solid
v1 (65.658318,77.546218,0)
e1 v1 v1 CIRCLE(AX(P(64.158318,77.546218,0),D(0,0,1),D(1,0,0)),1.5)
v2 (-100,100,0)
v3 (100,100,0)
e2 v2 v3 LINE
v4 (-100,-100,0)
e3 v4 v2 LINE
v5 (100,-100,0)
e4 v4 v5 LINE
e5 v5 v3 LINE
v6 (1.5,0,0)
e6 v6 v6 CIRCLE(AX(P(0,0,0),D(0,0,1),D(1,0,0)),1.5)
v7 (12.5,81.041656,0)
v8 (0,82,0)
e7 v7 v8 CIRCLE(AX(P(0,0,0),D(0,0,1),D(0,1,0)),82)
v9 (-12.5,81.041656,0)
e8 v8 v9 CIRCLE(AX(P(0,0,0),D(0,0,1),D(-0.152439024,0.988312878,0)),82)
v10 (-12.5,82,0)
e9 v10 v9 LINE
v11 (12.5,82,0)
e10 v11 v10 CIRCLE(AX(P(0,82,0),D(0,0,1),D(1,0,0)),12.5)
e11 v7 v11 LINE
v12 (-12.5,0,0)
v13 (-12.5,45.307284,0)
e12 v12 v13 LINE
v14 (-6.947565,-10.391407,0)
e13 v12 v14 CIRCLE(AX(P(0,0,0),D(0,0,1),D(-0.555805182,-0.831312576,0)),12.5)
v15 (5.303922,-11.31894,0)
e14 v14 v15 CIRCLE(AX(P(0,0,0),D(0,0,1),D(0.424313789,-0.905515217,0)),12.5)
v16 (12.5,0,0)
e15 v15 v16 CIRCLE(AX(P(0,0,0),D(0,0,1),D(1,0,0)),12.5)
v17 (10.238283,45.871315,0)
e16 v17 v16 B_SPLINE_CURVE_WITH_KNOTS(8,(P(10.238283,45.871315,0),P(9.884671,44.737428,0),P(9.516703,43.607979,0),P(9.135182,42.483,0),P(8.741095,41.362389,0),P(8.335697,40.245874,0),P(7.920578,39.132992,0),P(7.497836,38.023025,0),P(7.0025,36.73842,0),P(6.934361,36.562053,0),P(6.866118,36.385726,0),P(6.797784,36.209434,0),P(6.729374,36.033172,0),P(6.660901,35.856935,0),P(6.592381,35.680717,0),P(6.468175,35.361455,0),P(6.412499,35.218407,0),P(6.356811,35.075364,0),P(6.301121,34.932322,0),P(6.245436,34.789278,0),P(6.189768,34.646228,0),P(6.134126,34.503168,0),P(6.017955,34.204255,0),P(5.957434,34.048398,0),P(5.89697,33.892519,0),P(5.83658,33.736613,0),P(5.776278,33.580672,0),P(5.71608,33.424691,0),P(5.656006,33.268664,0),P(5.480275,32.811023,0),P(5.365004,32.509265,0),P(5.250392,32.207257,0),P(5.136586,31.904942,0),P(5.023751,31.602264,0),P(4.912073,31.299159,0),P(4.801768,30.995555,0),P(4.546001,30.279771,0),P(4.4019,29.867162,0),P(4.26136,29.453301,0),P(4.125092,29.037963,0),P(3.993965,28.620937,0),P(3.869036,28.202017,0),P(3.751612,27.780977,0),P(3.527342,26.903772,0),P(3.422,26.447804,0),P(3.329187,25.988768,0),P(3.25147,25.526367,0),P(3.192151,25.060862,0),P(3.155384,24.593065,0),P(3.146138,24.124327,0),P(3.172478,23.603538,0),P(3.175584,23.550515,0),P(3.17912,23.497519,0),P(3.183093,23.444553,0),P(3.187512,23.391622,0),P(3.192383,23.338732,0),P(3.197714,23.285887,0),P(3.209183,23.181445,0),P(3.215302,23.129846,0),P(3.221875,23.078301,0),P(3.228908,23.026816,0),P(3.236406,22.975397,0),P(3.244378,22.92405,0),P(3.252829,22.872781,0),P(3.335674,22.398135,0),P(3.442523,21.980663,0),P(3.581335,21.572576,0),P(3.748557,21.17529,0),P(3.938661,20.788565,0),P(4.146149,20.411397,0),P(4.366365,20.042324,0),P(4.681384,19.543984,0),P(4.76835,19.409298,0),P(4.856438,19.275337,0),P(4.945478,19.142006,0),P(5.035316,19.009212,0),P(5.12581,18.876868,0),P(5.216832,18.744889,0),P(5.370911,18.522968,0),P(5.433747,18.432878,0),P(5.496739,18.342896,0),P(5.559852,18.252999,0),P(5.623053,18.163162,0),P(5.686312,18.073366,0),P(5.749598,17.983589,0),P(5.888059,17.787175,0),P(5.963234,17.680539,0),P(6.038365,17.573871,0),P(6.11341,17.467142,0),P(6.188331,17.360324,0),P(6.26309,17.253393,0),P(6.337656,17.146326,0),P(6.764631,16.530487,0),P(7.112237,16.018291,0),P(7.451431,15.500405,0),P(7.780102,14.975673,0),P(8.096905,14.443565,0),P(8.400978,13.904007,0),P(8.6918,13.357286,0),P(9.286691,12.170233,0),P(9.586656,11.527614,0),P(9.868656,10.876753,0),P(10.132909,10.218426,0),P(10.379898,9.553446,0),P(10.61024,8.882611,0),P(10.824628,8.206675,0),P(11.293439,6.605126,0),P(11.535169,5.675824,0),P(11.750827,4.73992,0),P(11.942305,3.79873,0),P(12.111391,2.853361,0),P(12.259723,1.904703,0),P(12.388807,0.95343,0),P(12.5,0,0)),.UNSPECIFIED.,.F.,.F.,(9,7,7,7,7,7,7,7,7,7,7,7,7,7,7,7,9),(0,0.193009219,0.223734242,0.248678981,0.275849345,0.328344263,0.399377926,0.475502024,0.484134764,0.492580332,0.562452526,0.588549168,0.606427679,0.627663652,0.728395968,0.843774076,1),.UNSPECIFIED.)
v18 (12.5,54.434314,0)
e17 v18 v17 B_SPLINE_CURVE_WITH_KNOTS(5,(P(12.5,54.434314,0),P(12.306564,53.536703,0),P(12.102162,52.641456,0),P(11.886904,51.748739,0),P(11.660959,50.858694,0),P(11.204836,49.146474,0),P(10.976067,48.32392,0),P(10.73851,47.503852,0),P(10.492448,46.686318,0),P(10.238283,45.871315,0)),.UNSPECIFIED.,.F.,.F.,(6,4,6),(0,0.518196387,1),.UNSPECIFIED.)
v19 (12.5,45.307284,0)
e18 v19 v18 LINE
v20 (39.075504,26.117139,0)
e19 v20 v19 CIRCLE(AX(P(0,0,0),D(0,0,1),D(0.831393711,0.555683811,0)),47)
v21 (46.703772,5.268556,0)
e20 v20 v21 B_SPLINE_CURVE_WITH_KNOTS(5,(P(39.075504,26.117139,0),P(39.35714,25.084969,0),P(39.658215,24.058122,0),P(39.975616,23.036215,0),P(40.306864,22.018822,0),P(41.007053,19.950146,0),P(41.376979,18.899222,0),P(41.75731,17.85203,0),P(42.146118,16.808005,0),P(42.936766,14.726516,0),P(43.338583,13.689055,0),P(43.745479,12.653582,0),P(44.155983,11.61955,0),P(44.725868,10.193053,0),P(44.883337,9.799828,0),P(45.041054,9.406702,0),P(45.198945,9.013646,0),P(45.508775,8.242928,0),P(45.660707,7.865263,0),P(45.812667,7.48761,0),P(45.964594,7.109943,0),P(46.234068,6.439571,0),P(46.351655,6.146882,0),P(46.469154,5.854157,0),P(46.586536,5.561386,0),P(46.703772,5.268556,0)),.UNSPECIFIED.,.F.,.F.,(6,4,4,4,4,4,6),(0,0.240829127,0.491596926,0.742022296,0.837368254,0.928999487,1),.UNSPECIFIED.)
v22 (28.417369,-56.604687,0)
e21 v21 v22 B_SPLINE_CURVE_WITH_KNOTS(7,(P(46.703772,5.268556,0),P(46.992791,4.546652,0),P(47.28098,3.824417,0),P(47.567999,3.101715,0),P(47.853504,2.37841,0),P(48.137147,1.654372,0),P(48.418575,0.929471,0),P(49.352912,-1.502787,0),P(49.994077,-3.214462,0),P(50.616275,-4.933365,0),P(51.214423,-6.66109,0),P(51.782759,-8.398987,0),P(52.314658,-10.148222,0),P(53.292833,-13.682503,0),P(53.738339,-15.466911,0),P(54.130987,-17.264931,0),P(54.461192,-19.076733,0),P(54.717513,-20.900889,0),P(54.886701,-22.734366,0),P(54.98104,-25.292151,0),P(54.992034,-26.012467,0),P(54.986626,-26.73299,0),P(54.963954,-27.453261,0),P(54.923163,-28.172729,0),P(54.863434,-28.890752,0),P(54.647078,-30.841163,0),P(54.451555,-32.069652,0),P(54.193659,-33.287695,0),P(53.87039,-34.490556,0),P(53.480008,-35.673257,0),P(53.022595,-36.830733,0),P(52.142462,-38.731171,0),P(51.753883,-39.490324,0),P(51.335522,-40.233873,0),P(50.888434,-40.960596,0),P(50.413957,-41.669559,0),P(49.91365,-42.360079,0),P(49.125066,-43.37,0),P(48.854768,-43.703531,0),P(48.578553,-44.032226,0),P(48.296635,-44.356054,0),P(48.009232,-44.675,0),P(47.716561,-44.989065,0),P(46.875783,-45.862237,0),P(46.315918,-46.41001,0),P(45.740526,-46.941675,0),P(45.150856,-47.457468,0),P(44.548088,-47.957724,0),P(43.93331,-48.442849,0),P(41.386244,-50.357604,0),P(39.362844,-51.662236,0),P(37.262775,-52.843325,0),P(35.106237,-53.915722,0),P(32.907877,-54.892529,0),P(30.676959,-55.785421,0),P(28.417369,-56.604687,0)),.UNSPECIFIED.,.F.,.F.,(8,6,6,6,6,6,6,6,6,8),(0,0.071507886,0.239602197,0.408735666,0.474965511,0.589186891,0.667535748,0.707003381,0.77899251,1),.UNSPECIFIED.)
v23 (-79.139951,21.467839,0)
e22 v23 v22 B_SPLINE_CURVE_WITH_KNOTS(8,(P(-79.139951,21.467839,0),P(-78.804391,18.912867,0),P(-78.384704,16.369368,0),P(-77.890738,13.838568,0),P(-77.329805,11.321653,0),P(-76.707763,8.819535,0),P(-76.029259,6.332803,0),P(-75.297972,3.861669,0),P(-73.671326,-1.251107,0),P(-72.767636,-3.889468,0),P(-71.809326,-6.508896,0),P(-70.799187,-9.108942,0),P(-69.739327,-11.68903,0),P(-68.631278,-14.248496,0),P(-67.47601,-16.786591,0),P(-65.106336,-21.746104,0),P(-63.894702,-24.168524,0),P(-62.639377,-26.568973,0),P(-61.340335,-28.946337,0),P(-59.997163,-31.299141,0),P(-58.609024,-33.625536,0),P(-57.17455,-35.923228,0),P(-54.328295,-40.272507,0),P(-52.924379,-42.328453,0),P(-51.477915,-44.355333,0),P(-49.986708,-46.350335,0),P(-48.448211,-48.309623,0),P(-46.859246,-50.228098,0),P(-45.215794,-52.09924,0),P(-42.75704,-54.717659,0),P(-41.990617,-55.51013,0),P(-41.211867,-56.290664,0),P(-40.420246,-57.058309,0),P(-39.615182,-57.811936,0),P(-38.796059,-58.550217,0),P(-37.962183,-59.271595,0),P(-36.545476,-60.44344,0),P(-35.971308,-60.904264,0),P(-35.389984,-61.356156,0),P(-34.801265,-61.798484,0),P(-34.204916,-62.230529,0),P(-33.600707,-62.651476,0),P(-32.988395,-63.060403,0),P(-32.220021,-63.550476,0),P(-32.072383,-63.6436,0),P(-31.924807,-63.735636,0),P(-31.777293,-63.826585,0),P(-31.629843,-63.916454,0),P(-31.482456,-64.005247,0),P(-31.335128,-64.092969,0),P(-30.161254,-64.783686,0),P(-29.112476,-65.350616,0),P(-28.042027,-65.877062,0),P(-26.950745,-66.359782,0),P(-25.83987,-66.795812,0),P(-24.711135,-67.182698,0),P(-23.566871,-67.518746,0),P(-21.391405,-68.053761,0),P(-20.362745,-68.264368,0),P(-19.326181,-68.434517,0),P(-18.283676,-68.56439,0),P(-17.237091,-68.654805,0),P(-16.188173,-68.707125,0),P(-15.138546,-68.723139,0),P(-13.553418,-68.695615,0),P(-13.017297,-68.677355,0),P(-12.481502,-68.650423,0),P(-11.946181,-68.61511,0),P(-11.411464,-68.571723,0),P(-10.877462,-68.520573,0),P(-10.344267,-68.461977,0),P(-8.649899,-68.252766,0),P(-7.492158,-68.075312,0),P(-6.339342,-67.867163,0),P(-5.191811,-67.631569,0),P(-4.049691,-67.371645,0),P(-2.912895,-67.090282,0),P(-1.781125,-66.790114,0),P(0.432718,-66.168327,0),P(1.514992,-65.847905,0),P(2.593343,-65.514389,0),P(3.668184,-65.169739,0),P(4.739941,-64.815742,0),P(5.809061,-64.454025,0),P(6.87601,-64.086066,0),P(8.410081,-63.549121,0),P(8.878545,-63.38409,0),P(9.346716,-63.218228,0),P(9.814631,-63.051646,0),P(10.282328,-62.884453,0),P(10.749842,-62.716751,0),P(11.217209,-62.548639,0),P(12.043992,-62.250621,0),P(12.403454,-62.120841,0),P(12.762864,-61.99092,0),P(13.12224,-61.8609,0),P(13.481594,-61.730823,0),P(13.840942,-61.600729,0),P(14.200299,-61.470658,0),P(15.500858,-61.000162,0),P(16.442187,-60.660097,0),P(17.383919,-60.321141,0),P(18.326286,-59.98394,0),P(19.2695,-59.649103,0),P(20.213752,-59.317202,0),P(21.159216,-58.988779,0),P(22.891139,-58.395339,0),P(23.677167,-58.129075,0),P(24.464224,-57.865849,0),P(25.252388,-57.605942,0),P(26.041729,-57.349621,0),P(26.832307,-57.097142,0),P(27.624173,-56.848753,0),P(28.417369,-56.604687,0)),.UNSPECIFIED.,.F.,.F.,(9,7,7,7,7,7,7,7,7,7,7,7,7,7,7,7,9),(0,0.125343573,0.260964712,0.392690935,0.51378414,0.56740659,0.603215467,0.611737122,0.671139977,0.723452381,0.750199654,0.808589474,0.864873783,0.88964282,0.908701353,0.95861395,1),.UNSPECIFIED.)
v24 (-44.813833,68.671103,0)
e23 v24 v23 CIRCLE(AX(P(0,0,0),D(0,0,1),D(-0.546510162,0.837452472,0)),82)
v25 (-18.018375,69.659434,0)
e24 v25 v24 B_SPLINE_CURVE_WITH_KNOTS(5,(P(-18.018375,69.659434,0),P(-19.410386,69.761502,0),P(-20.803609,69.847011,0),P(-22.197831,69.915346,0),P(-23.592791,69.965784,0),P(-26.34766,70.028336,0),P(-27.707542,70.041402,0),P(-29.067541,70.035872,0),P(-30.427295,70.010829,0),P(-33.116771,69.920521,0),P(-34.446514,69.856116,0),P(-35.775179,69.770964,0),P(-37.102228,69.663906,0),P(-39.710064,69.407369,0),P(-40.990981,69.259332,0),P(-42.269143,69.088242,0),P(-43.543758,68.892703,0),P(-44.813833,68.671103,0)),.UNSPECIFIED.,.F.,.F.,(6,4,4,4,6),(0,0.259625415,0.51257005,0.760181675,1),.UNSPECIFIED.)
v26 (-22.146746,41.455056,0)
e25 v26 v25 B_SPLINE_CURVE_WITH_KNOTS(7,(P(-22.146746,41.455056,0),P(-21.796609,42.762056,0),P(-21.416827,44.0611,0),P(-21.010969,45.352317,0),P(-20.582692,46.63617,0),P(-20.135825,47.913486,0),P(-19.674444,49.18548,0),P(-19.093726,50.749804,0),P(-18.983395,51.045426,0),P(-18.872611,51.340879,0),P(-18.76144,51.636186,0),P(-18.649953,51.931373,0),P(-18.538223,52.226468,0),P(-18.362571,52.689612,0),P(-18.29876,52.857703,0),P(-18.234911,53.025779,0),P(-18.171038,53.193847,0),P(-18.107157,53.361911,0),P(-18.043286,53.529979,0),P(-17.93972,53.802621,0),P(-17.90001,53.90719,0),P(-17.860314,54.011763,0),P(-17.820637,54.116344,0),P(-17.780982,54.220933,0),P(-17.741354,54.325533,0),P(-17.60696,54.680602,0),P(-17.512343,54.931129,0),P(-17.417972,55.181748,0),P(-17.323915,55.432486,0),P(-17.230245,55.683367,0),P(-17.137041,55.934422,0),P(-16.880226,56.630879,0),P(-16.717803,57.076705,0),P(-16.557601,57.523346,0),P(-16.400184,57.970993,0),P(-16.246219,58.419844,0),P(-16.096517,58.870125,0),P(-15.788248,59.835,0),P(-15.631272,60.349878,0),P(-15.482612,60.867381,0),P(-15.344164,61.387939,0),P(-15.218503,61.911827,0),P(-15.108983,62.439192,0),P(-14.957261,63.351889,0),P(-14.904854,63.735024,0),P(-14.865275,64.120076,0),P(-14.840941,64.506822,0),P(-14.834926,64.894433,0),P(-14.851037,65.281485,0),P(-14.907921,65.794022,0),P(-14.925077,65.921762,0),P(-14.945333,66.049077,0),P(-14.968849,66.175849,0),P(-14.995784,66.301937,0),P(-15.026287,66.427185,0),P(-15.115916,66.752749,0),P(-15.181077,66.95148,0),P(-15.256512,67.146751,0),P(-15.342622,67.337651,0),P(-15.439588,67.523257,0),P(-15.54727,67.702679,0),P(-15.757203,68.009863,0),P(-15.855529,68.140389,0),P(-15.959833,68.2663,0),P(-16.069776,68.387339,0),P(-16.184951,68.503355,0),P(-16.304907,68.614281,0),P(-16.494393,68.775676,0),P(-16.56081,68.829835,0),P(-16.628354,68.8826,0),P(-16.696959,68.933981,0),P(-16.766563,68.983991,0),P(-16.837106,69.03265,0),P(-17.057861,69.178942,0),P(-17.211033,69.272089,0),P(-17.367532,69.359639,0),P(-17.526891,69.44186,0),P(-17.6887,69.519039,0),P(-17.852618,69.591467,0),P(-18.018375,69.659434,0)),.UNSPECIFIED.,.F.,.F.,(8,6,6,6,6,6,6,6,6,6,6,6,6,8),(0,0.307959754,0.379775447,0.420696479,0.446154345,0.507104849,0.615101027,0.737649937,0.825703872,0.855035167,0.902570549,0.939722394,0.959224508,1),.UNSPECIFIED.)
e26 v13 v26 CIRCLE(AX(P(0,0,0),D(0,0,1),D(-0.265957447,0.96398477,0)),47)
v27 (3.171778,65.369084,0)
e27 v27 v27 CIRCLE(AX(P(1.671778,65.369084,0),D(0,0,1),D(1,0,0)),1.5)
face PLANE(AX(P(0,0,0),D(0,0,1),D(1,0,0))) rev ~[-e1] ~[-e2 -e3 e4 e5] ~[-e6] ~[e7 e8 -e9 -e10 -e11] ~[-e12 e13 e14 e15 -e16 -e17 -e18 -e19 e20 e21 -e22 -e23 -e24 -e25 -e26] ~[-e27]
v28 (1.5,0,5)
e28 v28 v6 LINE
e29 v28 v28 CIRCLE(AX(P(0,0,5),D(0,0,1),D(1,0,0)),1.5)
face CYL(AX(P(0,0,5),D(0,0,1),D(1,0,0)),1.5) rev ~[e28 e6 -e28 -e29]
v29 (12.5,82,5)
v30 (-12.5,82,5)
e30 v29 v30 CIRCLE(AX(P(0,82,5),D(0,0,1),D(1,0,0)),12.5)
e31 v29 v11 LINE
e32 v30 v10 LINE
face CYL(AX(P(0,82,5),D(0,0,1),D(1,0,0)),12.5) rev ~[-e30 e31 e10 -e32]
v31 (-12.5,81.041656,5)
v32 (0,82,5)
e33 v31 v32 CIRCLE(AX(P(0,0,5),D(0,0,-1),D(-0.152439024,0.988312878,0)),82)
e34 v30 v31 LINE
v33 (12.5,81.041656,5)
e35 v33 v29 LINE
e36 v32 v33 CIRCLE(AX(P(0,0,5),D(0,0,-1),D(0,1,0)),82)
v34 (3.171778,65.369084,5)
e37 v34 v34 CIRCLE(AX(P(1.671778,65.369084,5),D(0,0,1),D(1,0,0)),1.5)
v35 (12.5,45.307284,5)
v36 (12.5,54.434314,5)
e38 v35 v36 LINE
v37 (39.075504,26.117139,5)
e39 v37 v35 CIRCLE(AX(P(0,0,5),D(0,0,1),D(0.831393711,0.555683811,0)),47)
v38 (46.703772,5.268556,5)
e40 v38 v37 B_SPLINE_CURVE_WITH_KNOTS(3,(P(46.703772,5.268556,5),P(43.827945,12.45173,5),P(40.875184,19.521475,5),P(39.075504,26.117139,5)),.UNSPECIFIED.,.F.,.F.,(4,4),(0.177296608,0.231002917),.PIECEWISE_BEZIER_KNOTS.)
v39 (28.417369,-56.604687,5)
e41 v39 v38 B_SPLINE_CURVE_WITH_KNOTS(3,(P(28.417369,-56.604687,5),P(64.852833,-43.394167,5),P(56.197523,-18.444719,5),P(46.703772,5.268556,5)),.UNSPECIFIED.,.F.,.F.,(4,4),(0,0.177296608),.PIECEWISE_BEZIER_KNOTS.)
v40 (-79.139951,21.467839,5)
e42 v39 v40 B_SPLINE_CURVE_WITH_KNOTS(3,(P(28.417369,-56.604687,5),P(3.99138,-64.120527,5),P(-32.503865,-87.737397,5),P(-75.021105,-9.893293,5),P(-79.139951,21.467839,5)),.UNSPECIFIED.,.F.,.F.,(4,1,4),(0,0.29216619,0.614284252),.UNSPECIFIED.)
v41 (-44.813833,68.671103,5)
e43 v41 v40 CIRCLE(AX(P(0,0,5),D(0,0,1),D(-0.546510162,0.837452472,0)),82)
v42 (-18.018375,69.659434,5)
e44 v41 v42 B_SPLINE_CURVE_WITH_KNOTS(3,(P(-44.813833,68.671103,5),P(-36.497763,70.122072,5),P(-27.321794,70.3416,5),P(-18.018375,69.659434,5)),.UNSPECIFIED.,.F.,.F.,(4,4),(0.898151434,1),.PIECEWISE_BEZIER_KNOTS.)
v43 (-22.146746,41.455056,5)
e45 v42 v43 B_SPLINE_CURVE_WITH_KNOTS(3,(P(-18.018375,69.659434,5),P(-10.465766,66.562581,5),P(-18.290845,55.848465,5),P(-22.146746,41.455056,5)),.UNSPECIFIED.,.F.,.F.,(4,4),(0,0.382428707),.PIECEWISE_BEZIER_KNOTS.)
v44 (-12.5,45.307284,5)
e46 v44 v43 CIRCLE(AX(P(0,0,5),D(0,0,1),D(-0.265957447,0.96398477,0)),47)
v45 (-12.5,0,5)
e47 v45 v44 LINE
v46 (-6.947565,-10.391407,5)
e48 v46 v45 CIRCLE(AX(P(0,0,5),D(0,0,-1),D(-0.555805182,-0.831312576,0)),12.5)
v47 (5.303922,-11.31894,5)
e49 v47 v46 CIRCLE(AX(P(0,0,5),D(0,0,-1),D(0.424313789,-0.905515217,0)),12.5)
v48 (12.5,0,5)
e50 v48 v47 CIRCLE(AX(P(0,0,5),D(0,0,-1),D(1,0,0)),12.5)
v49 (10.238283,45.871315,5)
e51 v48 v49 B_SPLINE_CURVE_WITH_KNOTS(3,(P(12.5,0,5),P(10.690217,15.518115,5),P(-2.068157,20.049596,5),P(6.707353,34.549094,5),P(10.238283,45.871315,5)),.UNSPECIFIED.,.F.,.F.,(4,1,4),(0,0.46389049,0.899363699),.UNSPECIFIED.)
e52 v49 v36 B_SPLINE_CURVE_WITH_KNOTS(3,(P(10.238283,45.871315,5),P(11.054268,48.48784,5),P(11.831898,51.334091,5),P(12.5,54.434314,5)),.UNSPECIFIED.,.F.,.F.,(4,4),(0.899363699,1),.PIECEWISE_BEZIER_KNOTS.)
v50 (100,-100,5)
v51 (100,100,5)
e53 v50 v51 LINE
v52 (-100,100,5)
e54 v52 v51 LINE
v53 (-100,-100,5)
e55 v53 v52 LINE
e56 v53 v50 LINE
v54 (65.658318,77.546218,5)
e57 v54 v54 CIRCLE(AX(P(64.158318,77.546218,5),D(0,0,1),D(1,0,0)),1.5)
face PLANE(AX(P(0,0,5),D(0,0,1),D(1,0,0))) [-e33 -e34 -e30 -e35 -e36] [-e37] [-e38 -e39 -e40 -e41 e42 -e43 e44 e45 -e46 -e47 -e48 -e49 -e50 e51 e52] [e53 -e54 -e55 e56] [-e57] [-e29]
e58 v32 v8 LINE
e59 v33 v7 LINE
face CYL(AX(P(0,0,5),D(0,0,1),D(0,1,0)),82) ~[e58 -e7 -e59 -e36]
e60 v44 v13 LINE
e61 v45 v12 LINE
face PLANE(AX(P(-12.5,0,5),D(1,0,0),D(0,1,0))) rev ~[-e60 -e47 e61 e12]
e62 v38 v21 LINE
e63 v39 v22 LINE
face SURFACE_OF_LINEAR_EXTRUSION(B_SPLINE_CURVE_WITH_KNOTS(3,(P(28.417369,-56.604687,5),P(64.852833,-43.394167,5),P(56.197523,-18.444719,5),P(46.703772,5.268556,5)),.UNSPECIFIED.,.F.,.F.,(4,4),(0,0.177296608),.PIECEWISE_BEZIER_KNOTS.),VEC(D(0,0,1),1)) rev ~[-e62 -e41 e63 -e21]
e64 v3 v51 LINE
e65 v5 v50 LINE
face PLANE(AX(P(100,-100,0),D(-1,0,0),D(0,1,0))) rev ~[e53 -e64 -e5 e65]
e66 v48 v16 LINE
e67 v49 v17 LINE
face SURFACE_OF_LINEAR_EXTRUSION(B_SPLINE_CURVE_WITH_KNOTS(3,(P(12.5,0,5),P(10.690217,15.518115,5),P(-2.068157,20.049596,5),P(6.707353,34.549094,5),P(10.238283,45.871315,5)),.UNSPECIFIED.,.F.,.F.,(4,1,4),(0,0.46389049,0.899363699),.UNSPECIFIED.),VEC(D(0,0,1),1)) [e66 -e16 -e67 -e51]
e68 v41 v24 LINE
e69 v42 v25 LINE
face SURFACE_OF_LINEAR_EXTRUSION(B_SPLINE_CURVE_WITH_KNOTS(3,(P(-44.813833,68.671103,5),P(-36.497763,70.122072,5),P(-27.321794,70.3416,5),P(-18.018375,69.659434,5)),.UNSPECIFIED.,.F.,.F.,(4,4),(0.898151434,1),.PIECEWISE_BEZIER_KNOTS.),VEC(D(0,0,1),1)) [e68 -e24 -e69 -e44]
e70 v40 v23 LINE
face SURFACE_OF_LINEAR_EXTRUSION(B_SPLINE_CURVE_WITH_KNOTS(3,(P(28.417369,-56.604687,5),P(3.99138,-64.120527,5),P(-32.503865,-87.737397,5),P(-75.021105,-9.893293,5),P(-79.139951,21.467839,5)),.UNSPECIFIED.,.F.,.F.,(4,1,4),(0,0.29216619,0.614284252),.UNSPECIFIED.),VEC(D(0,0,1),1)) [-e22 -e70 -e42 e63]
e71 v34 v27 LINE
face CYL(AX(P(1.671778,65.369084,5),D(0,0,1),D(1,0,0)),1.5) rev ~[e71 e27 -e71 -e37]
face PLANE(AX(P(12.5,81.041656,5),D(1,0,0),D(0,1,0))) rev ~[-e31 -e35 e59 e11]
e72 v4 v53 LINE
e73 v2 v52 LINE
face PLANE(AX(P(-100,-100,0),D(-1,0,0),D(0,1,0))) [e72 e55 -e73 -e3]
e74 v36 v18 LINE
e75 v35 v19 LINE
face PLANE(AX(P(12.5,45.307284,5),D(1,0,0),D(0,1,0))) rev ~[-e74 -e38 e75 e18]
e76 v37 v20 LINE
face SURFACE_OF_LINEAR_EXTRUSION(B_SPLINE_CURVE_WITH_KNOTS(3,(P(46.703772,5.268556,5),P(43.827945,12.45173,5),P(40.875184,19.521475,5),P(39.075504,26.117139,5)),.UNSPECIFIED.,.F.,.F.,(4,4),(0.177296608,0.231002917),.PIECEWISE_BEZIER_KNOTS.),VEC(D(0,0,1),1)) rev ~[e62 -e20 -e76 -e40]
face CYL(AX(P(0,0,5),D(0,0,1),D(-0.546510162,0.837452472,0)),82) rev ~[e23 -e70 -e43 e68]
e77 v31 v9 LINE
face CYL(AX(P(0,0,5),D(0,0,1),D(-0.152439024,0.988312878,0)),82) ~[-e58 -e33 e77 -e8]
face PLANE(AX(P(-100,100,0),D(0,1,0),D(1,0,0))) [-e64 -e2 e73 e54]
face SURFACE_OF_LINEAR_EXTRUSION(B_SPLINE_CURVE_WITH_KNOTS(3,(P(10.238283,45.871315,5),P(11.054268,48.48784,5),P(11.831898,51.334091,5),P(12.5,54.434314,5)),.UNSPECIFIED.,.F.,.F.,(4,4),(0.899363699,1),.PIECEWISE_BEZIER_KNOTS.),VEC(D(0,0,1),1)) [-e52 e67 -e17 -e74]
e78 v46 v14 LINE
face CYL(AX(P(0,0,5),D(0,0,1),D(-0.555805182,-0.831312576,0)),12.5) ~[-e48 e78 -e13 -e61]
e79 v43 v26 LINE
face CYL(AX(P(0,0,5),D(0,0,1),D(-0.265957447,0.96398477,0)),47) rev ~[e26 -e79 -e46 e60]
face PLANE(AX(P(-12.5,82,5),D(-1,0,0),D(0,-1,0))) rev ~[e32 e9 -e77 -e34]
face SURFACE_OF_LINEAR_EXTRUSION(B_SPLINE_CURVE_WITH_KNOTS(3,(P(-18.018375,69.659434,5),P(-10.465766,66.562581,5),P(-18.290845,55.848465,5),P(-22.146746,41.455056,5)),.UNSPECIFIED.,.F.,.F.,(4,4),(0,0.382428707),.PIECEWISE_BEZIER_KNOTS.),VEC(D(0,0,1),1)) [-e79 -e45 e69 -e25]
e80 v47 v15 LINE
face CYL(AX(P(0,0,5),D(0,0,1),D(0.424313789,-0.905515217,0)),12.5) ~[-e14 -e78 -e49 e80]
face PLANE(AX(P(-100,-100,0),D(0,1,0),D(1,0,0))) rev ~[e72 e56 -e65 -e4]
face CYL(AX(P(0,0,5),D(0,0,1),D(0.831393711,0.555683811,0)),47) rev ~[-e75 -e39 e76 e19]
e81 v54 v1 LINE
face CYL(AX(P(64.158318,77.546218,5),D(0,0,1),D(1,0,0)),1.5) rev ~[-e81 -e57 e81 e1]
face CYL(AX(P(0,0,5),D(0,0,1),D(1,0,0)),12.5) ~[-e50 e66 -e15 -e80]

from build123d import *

# Parameters (mm, degrees)
F0_W     = 200
F0_H     = 200
F1_DEPTH = 5
F2_R     = 1.5
F3_DEPTH = 5.001
F4_R     = 1.5
F5_DEPTH = 5.001


# Not quite as in the source:
# - a feature names something its author has since deleted; it is built from what else it names


with BuildPart() as f1:
    # F0 (on Top) → F1 (new body)
    with BuildSketch(Plane.XY):
        Rectangle(F0_W, F0_H)
    extrude(amount=F1_DEPTH)

    # F2 (on face) → F3 (cut, through all)
    with BuildSketch(Plane.XY.offset(5)):
        Circle(F2_R)
        with Locations((0, -63.662)):
            Circle(F2_R)
        with Locations((64.1583176089, 77.5462182691)):
            Circle(F2_R)
        with Locations((-51.9230208324, 31.0114389966)):
            Circle(F2_R)
        with Locations((1.6717778053, 65.3690844774)):
            Circle(F2_R)
    extrude(amount=-F3_DEPTH, mode=Mode.SUBTRACT)

    # F4 (on face) → F5 (cut, through all)
    with BuildSketch(Plane.XY.offset(5)):
        with BuildLine():
            Line((-12.5, 0), (-12.5, 45.3072841826))
            ThreePointArc((-12.5, 45.3072841826), (-17.4301226021, 43.6484916816), (-22.1467463119, 41.4550555156))
            add(Edge.make_bspline(
                [(-22.1467463119, 41.4550555156), (-22.9092474685, 38.6087716354), (-26.7916480004, 19.492616055), (-18.2157949408, -4.2593218119), (-6.9475647742, -10.3914072054)],
                knots=[0.382428707, 0.382428707, 0.382428707, 0.382428707, 0.4580536444, 0.8659002673, 0.8659002673, 0.8659002673, 0.8659002673], degree=3))
            ThreePointArc((-6.9475647742, -10.3914072054), (-11.024848291, -5.8909014727), (-12.5, 0))
        make_face()
        with BuildLine():
            ThreePointArc((-44.8138332434, 68.6711027291), (-66.3187168056, 48.2268369402), (-79.1399512645, 21.4678390587))
            add(Edge.make_bspline(
                [(28.4173693508, -56.6046871245), (3.9913801126, -64.1205269264), (-32.503865236, -87.7373972459), (-75.0211054276, -9.8932929428), (-79.1399512645, 21.4678390587)],
                knots=[0, 0, 0, 0, 0.2921661902, 0.6142842516, 0.6142842516, 0.6142842516, 0.6142842516], degree=3))
            add(Edge.make_bspline(
                [(28.4173693508, -56.6046871245), (64.8528327163, -43.3941669474), (56.1975225425, -18.4447190671), (46.7037719975, 5.2685558936)],
                knots=[0, 0, 0, 0, 0.1772966077, 0.1772966077, 0.1772966077, 0.1772966077], degree=3))
            ThreePointArc((46.7037719975, 5.2685558936), (46.9258845622, 2.6384385644), (47, 0))
            ThreePointArc((47, 0), (-24.1671566733, -40.310650433), (-22.1467463119, 41.4550555156))
            add(Edge.make_bspline(
                [(-18.0183753353, 69.6594335387), (-10.4657655575, 66.5625813654), (-18.2908445233, 55.8484646377), (-22.1467463119, 41.4550555156)],
                knots=[0, 0, 0, 0, 0.382428707, 0.382428707, 0.382428707, 0.382428707], degree=3))
            add(Edge.make_bspline(
                [(-44.8138332434, 68.6711027291), (-36.4977633391, 70.1220717043), (-27.3217936199, 70.3416004143), (-18.0183753353, 69.6594335387)],
                knots=[0.898151434, 0.898151434, 0.898151434, 0.898151434, 1, 1, 1, 1], degree=3))
        make_face()
        with Locations((0, -63.662)):
            Circle(F4_R, mode=Mode.SUBTRACT)
        with Locations((-51.9230208324, 31.0114389966)):
            Circle(F4_R, mode=Mode.SUBTRACT)
        with BuildLine():
            add(Edge.make_bspline(
                [(46.7037719975, 5.2685558936), (43.8279453898, 12.4517304214), (40.8751841388, 19.5214746733), (39.0755044059, 26.1171391125)],
                knots=[0.1772966077, 0.1772966077, 0.1772966077, 0.1772966077, 0.2310029169, 0.2310029169, 0.2310029169, 0.2310029169], degree=3))
            ThreePointArc((39.0755044059, 26.1171391125), (27.5149701187, 38.1041522589), (12.5, 45.3072841826))
            Line((12.5, 45.3072841826), (12.5, 0))
            ThreePointArc((12.5, 0), (10.548673601, -6.7063764627), (5.3039223586, -11.318940216))
            ThreePointArc((5.3039223586, -11.318940216), (-0.9436468985, -12.4643303282), (-6.9475647742, -10.3914072054))
            add(Edge.make_bspline(
                [(-22.1467463119, 41.4550555156), (-22.9092474685, 38.6087716354), (-26.7916480004, 19.492616055), (-18.2157949408, -4.2593218119), (-6.9475647742, -10.3914072054)],
                knots=[0.382428707, 0.382428707, 0.382428707, 0.382428707, 0.4580536444, 0.8659002673, 0.8659002673, 0.8659002673, 0.8659002673], degree=3))
            ThreePointArc((-22.1467463119, 41.4550555156), (-24.1671566733, -40.310650433), (47, 0))
            ThreePointArc((47, 0), (46.9258845622, 2.6384385644), (46.7037719975, 5.2685558936))
        make_face()
        with BuildLine():
            Line((12.5, 0), (12.5, 45.3072841826))
            ThreePointArc((12.5, 45.3072841826), (11.372638641, 45.6033232379), (10.2382828633, 45.8713152636))
            add(Edge.make_bspline(
                [(12.5, 0), (10.6902167617, 15.518115425), (-2.0681567086, 20.0495964199), (6.7073533039, 34.5490943361), (10.2382828633, 45.8713152636)],
                knots=[0, 0, 0, 0, 0.4638904895, 0.8993636987, 0.8993636987, 0.8993636987, 0.8993636987], degree=3))
        make_face()
        with BuildLine():
            Line((12.5, 45.3072841826), (12.5, 54.4343143702))
            add(Edge.make_bspline(
                [(10.2382828633, 45.8713152636), (11.0542680571, 48.4878400289), (11.8318981736, 51.3340910932), (12.5, 54.4343143702)],
                knots=[0.8993636987, 0.8993636987, 0.8993636987, 0.8993636987, 1, 1, 1, 1], degree=3))
            ThreePointArc((10.2382828633, 45.8713152636), (11.372638641, 45.6033232379), (12.5, 45.3072841826))
        make_face()
        with BuildLine():
            Line((-12.5, 82), (-12.5, 81.0416559554))
            ThreePointArc((-12.5, 81.0416559554), (-6.2683415531, 81.7600629536), (0, 82))
            ThreePointArc((0, 82), (6.2683415531, 81.7600629536), (12.5, 81.0416559554))
            Line((12.5, 81.0416559554), (12.5, 82))
            ThreePointArc((12.5, 82), (0, 94.5), (-12.5, 82))
        make_face()
    extrude(amount=-F5_DEPTH, mode=Mode.SUBTRACT)


solid = f1.part
